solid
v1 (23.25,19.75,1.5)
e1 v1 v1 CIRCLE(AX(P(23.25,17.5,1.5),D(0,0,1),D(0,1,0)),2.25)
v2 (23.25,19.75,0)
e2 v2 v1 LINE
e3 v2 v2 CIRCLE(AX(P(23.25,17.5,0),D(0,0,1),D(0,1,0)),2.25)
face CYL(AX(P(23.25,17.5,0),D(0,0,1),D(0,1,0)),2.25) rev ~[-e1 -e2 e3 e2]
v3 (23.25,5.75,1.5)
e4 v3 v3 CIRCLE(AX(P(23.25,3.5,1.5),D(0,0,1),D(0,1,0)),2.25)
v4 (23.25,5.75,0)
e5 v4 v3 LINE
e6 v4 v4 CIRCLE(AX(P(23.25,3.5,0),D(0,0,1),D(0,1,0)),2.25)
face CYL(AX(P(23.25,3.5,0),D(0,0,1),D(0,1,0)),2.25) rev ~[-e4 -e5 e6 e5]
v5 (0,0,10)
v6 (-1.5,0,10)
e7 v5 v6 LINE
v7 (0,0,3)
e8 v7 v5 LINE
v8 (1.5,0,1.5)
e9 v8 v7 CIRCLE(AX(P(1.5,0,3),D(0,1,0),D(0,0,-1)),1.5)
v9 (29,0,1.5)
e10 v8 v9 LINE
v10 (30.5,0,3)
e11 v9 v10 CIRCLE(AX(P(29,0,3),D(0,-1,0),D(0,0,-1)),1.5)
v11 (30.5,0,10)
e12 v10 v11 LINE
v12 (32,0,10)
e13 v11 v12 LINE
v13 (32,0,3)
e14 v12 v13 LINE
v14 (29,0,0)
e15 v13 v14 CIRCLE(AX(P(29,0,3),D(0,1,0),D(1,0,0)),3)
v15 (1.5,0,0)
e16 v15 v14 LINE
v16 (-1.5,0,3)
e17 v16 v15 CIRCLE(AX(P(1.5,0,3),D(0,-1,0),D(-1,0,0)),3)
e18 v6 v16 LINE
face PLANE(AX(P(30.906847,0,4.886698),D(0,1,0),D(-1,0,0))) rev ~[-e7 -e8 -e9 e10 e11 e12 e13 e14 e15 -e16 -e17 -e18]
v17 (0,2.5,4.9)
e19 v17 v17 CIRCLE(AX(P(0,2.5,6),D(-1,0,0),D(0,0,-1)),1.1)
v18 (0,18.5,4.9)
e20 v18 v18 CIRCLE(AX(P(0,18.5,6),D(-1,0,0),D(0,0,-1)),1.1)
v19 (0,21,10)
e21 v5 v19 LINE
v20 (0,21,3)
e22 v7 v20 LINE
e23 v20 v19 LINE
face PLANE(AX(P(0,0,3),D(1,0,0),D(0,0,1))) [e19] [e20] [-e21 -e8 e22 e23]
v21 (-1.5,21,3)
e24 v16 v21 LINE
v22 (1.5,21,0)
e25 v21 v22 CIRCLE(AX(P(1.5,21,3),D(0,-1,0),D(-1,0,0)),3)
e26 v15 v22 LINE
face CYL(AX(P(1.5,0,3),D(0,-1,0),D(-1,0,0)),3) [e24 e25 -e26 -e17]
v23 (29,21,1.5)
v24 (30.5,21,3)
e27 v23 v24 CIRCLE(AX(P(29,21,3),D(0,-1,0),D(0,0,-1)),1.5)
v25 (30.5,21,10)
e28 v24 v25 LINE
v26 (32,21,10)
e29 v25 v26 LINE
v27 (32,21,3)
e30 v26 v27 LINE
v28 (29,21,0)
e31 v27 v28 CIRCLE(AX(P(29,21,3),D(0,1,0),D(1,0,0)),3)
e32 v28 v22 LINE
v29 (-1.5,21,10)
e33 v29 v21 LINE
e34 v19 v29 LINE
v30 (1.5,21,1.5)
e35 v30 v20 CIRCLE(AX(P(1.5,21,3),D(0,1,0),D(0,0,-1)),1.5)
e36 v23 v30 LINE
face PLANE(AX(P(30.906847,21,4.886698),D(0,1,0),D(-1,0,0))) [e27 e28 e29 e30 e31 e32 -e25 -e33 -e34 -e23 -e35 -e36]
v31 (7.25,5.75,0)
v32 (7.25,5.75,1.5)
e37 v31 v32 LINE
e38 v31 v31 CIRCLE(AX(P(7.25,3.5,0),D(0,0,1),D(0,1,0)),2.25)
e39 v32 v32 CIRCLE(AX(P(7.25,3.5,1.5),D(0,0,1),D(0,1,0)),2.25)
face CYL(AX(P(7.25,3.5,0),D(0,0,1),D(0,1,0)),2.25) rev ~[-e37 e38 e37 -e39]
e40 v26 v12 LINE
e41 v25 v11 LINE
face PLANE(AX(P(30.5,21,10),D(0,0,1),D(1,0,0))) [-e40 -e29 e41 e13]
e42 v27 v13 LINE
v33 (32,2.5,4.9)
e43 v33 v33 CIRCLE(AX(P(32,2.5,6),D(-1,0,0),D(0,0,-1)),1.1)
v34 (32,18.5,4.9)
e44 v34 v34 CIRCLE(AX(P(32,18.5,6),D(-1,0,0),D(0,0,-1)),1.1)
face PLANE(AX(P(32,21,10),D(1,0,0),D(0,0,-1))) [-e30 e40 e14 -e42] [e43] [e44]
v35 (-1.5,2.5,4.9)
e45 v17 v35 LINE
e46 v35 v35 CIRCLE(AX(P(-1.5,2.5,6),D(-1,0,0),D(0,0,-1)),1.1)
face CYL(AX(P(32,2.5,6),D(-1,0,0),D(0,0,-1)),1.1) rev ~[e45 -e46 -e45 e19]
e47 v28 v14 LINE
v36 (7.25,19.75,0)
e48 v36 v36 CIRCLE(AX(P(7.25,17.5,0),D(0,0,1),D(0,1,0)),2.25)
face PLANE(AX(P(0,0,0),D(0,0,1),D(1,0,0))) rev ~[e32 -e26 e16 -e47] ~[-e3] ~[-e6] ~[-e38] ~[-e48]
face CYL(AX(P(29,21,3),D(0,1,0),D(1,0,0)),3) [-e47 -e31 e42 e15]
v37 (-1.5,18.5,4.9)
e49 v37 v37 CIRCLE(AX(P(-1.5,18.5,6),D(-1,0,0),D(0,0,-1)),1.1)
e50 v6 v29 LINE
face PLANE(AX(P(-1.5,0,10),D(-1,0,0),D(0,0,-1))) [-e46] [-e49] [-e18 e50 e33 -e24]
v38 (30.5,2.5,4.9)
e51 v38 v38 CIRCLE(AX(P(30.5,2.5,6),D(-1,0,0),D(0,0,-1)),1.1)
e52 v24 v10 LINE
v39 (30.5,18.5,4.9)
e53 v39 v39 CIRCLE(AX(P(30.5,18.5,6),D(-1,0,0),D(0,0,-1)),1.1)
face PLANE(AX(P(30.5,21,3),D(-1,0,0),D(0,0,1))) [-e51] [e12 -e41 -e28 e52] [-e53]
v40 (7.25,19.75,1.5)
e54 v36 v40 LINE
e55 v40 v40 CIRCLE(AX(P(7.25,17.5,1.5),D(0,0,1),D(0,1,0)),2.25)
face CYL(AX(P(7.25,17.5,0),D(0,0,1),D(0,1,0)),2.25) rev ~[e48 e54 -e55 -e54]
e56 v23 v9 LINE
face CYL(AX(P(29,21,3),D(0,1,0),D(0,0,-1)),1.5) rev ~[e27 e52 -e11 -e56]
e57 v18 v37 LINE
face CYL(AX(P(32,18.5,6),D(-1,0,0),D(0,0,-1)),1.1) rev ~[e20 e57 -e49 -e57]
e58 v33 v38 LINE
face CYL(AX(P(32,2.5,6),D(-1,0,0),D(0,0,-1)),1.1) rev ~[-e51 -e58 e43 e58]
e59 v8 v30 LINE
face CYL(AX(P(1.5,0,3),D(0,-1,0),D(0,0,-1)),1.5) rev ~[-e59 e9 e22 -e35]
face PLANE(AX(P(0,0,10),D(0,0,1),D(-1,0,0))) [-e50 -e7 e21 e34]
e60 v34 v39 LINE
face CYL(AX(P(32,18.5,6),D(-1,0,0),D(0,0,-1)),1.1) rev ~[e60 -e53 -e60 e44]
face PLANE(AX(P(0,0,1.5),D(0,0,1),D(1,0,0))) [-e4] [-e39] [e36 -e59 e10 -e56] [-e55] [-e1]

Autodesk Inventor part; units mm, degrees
ref_plane "YZ Plane" through (0, 0, 0) normal (1, 0, 0) x (0, 1, 0)
ref_plane "XZ Plane" through (0, 0, 0) normal (0, 1, 0) x (-1, 0, 0)
ref_plane "XY Plane" through (0, 0, 0) normal (0, 0, 1) x (1, 0, 0)
sketch "スケッチ1" plane through (0, 0, 0) normal (0, 0, 1) x (1, 0, 0)
  line L0 (0, 0) -> (30.5, 0)
  line L1 (30.5, 0) -> (30.5, 21)
  line L2 (30.5, 21) -> (0, 21)
  line L3 (0, 21) -> (0, 0)
  dimension "d0" = 30.5
  dimension "d1" = 21
extrude "プレート1" add sketch "スケッチ1" along normal blind 1.5
sketch "スケッチ2" plane through (30.5, 21, 1.5) normal (1, 0, 0) x (0, 1, 0)
  line L0 (-21, 0) -> (0, 0)
  line L1 (0, 0) -> (0, 8.5)
  line L2 (0, 8.5) -> (-21, 8.5)
  line L3 (-21, 8.5) -> (-21, 0)
edge flange "フランジ1" height 10 angle 90 thickness 1.5 bend radius 1.5 thickness toward (1, 0, 0) relief tear relief width 1.5 relief depth 0.75 corner gap 1.5 corner form 0 edges at (30.5, 10.5, 1.5) (0, 10.5, 1.5) wall of the first edge with corners at (30.5, 0, 1.5) (30.5, 21, 1.5) (30.5, 21, 10) (30.5, 0, 10)
bend "曲げ1"
corner "コーナー1"
sketch "スケッチ3" plane through (32, 0, 10) normal (1, 0, 0) x (0, 0, -1)
  line L0 (4, 0) -> (4, 21) construction
  line L1 (7, 21) -> (0, 21) projected
  line L2 (0, 21) -> (0, 0) projected
  line L3 (0, 10.5) -> (4, 10.5)
  point P0 (10, 0)
  point P1 (4, 2.5)
  point P2 (4, 18.5)
  dimension "d15" = 4
  dimension "d16" = 16
hole "穴1" at (32, 2.5, 6) at (32, 18.5, 6) direction (-1, 0, 0) diameter 2.2 end through all
sketch "スケッチ4" plane through (0, 0, 0) normal (0, 0, -1) x (-1, 0, 0)
  line L0 (-32, 0) -> (-32, 21) projected
  line L1 (-32, 10.5) -> (1.5, 10.5)
  line L2 (1.5, 21) -> (1.5, 0) projected
  line L3 (-29, 0) -> (-1.5, 0) projected
  line L4 (-15.25, 0) -> (-15.25, 21)
  line L5 (-1.5, 21) -> (-29, 21) projected
  point P0 (0, 0)
  point P1 (-23.25, 3.5)
  point P2 (-23.25, 17.5)
  point P3 (-7.25, 3.5)
  point P4 (-7.25, 17.5)
  dimension "d31" = 14
  dimension "d32" = 16
hole "穴2" at (23.25, 3.5, 0) at (23.25, 17.5, 0) at (7.25, 3.5, 0) at (7.25, 17.5, 0) direction (0, 0, 1) diameter 4.5 end through all
equation "\"d22\" = Thickness"
equation "\"d29\" = Thickness"
equation "\"d2\" = Thickness"
equation "\"d3\" = BendReliefWidth"
equation "\"d4\" = BendReliefDepth"
equation "\"d5\" = MinimumRemnant"
equation "\"d6\" = TransitionRadius"
equation "\"d9\" = BendRadius"
equation "\"d10\" = CornerReliefSize"
equation "\"d11\" = GapSize"
equation "\"d12\" = JacobiRadiusSize"
equation "\"BendRadius\" = Thickness"
equation "\"BendReliefWidth\" = Thickness"
equation "\"BendReliefDepth\" = 0.5 * Thickness"
equation "\"CornerReliefSize\" = 4 * Thickness"
equation "\"MinimumRemnant\" = 2 * Thickness"
equation "\"TransitionRadius\" = BendRadius"
equation "\"JacobiRadiusSize\" = BendRadius"
equation "\"GapSize\" = Thickness"
equation "\"Thickness\" = 1.5"
properties part number "servo_bracket" material "アルミニウム 6061"
